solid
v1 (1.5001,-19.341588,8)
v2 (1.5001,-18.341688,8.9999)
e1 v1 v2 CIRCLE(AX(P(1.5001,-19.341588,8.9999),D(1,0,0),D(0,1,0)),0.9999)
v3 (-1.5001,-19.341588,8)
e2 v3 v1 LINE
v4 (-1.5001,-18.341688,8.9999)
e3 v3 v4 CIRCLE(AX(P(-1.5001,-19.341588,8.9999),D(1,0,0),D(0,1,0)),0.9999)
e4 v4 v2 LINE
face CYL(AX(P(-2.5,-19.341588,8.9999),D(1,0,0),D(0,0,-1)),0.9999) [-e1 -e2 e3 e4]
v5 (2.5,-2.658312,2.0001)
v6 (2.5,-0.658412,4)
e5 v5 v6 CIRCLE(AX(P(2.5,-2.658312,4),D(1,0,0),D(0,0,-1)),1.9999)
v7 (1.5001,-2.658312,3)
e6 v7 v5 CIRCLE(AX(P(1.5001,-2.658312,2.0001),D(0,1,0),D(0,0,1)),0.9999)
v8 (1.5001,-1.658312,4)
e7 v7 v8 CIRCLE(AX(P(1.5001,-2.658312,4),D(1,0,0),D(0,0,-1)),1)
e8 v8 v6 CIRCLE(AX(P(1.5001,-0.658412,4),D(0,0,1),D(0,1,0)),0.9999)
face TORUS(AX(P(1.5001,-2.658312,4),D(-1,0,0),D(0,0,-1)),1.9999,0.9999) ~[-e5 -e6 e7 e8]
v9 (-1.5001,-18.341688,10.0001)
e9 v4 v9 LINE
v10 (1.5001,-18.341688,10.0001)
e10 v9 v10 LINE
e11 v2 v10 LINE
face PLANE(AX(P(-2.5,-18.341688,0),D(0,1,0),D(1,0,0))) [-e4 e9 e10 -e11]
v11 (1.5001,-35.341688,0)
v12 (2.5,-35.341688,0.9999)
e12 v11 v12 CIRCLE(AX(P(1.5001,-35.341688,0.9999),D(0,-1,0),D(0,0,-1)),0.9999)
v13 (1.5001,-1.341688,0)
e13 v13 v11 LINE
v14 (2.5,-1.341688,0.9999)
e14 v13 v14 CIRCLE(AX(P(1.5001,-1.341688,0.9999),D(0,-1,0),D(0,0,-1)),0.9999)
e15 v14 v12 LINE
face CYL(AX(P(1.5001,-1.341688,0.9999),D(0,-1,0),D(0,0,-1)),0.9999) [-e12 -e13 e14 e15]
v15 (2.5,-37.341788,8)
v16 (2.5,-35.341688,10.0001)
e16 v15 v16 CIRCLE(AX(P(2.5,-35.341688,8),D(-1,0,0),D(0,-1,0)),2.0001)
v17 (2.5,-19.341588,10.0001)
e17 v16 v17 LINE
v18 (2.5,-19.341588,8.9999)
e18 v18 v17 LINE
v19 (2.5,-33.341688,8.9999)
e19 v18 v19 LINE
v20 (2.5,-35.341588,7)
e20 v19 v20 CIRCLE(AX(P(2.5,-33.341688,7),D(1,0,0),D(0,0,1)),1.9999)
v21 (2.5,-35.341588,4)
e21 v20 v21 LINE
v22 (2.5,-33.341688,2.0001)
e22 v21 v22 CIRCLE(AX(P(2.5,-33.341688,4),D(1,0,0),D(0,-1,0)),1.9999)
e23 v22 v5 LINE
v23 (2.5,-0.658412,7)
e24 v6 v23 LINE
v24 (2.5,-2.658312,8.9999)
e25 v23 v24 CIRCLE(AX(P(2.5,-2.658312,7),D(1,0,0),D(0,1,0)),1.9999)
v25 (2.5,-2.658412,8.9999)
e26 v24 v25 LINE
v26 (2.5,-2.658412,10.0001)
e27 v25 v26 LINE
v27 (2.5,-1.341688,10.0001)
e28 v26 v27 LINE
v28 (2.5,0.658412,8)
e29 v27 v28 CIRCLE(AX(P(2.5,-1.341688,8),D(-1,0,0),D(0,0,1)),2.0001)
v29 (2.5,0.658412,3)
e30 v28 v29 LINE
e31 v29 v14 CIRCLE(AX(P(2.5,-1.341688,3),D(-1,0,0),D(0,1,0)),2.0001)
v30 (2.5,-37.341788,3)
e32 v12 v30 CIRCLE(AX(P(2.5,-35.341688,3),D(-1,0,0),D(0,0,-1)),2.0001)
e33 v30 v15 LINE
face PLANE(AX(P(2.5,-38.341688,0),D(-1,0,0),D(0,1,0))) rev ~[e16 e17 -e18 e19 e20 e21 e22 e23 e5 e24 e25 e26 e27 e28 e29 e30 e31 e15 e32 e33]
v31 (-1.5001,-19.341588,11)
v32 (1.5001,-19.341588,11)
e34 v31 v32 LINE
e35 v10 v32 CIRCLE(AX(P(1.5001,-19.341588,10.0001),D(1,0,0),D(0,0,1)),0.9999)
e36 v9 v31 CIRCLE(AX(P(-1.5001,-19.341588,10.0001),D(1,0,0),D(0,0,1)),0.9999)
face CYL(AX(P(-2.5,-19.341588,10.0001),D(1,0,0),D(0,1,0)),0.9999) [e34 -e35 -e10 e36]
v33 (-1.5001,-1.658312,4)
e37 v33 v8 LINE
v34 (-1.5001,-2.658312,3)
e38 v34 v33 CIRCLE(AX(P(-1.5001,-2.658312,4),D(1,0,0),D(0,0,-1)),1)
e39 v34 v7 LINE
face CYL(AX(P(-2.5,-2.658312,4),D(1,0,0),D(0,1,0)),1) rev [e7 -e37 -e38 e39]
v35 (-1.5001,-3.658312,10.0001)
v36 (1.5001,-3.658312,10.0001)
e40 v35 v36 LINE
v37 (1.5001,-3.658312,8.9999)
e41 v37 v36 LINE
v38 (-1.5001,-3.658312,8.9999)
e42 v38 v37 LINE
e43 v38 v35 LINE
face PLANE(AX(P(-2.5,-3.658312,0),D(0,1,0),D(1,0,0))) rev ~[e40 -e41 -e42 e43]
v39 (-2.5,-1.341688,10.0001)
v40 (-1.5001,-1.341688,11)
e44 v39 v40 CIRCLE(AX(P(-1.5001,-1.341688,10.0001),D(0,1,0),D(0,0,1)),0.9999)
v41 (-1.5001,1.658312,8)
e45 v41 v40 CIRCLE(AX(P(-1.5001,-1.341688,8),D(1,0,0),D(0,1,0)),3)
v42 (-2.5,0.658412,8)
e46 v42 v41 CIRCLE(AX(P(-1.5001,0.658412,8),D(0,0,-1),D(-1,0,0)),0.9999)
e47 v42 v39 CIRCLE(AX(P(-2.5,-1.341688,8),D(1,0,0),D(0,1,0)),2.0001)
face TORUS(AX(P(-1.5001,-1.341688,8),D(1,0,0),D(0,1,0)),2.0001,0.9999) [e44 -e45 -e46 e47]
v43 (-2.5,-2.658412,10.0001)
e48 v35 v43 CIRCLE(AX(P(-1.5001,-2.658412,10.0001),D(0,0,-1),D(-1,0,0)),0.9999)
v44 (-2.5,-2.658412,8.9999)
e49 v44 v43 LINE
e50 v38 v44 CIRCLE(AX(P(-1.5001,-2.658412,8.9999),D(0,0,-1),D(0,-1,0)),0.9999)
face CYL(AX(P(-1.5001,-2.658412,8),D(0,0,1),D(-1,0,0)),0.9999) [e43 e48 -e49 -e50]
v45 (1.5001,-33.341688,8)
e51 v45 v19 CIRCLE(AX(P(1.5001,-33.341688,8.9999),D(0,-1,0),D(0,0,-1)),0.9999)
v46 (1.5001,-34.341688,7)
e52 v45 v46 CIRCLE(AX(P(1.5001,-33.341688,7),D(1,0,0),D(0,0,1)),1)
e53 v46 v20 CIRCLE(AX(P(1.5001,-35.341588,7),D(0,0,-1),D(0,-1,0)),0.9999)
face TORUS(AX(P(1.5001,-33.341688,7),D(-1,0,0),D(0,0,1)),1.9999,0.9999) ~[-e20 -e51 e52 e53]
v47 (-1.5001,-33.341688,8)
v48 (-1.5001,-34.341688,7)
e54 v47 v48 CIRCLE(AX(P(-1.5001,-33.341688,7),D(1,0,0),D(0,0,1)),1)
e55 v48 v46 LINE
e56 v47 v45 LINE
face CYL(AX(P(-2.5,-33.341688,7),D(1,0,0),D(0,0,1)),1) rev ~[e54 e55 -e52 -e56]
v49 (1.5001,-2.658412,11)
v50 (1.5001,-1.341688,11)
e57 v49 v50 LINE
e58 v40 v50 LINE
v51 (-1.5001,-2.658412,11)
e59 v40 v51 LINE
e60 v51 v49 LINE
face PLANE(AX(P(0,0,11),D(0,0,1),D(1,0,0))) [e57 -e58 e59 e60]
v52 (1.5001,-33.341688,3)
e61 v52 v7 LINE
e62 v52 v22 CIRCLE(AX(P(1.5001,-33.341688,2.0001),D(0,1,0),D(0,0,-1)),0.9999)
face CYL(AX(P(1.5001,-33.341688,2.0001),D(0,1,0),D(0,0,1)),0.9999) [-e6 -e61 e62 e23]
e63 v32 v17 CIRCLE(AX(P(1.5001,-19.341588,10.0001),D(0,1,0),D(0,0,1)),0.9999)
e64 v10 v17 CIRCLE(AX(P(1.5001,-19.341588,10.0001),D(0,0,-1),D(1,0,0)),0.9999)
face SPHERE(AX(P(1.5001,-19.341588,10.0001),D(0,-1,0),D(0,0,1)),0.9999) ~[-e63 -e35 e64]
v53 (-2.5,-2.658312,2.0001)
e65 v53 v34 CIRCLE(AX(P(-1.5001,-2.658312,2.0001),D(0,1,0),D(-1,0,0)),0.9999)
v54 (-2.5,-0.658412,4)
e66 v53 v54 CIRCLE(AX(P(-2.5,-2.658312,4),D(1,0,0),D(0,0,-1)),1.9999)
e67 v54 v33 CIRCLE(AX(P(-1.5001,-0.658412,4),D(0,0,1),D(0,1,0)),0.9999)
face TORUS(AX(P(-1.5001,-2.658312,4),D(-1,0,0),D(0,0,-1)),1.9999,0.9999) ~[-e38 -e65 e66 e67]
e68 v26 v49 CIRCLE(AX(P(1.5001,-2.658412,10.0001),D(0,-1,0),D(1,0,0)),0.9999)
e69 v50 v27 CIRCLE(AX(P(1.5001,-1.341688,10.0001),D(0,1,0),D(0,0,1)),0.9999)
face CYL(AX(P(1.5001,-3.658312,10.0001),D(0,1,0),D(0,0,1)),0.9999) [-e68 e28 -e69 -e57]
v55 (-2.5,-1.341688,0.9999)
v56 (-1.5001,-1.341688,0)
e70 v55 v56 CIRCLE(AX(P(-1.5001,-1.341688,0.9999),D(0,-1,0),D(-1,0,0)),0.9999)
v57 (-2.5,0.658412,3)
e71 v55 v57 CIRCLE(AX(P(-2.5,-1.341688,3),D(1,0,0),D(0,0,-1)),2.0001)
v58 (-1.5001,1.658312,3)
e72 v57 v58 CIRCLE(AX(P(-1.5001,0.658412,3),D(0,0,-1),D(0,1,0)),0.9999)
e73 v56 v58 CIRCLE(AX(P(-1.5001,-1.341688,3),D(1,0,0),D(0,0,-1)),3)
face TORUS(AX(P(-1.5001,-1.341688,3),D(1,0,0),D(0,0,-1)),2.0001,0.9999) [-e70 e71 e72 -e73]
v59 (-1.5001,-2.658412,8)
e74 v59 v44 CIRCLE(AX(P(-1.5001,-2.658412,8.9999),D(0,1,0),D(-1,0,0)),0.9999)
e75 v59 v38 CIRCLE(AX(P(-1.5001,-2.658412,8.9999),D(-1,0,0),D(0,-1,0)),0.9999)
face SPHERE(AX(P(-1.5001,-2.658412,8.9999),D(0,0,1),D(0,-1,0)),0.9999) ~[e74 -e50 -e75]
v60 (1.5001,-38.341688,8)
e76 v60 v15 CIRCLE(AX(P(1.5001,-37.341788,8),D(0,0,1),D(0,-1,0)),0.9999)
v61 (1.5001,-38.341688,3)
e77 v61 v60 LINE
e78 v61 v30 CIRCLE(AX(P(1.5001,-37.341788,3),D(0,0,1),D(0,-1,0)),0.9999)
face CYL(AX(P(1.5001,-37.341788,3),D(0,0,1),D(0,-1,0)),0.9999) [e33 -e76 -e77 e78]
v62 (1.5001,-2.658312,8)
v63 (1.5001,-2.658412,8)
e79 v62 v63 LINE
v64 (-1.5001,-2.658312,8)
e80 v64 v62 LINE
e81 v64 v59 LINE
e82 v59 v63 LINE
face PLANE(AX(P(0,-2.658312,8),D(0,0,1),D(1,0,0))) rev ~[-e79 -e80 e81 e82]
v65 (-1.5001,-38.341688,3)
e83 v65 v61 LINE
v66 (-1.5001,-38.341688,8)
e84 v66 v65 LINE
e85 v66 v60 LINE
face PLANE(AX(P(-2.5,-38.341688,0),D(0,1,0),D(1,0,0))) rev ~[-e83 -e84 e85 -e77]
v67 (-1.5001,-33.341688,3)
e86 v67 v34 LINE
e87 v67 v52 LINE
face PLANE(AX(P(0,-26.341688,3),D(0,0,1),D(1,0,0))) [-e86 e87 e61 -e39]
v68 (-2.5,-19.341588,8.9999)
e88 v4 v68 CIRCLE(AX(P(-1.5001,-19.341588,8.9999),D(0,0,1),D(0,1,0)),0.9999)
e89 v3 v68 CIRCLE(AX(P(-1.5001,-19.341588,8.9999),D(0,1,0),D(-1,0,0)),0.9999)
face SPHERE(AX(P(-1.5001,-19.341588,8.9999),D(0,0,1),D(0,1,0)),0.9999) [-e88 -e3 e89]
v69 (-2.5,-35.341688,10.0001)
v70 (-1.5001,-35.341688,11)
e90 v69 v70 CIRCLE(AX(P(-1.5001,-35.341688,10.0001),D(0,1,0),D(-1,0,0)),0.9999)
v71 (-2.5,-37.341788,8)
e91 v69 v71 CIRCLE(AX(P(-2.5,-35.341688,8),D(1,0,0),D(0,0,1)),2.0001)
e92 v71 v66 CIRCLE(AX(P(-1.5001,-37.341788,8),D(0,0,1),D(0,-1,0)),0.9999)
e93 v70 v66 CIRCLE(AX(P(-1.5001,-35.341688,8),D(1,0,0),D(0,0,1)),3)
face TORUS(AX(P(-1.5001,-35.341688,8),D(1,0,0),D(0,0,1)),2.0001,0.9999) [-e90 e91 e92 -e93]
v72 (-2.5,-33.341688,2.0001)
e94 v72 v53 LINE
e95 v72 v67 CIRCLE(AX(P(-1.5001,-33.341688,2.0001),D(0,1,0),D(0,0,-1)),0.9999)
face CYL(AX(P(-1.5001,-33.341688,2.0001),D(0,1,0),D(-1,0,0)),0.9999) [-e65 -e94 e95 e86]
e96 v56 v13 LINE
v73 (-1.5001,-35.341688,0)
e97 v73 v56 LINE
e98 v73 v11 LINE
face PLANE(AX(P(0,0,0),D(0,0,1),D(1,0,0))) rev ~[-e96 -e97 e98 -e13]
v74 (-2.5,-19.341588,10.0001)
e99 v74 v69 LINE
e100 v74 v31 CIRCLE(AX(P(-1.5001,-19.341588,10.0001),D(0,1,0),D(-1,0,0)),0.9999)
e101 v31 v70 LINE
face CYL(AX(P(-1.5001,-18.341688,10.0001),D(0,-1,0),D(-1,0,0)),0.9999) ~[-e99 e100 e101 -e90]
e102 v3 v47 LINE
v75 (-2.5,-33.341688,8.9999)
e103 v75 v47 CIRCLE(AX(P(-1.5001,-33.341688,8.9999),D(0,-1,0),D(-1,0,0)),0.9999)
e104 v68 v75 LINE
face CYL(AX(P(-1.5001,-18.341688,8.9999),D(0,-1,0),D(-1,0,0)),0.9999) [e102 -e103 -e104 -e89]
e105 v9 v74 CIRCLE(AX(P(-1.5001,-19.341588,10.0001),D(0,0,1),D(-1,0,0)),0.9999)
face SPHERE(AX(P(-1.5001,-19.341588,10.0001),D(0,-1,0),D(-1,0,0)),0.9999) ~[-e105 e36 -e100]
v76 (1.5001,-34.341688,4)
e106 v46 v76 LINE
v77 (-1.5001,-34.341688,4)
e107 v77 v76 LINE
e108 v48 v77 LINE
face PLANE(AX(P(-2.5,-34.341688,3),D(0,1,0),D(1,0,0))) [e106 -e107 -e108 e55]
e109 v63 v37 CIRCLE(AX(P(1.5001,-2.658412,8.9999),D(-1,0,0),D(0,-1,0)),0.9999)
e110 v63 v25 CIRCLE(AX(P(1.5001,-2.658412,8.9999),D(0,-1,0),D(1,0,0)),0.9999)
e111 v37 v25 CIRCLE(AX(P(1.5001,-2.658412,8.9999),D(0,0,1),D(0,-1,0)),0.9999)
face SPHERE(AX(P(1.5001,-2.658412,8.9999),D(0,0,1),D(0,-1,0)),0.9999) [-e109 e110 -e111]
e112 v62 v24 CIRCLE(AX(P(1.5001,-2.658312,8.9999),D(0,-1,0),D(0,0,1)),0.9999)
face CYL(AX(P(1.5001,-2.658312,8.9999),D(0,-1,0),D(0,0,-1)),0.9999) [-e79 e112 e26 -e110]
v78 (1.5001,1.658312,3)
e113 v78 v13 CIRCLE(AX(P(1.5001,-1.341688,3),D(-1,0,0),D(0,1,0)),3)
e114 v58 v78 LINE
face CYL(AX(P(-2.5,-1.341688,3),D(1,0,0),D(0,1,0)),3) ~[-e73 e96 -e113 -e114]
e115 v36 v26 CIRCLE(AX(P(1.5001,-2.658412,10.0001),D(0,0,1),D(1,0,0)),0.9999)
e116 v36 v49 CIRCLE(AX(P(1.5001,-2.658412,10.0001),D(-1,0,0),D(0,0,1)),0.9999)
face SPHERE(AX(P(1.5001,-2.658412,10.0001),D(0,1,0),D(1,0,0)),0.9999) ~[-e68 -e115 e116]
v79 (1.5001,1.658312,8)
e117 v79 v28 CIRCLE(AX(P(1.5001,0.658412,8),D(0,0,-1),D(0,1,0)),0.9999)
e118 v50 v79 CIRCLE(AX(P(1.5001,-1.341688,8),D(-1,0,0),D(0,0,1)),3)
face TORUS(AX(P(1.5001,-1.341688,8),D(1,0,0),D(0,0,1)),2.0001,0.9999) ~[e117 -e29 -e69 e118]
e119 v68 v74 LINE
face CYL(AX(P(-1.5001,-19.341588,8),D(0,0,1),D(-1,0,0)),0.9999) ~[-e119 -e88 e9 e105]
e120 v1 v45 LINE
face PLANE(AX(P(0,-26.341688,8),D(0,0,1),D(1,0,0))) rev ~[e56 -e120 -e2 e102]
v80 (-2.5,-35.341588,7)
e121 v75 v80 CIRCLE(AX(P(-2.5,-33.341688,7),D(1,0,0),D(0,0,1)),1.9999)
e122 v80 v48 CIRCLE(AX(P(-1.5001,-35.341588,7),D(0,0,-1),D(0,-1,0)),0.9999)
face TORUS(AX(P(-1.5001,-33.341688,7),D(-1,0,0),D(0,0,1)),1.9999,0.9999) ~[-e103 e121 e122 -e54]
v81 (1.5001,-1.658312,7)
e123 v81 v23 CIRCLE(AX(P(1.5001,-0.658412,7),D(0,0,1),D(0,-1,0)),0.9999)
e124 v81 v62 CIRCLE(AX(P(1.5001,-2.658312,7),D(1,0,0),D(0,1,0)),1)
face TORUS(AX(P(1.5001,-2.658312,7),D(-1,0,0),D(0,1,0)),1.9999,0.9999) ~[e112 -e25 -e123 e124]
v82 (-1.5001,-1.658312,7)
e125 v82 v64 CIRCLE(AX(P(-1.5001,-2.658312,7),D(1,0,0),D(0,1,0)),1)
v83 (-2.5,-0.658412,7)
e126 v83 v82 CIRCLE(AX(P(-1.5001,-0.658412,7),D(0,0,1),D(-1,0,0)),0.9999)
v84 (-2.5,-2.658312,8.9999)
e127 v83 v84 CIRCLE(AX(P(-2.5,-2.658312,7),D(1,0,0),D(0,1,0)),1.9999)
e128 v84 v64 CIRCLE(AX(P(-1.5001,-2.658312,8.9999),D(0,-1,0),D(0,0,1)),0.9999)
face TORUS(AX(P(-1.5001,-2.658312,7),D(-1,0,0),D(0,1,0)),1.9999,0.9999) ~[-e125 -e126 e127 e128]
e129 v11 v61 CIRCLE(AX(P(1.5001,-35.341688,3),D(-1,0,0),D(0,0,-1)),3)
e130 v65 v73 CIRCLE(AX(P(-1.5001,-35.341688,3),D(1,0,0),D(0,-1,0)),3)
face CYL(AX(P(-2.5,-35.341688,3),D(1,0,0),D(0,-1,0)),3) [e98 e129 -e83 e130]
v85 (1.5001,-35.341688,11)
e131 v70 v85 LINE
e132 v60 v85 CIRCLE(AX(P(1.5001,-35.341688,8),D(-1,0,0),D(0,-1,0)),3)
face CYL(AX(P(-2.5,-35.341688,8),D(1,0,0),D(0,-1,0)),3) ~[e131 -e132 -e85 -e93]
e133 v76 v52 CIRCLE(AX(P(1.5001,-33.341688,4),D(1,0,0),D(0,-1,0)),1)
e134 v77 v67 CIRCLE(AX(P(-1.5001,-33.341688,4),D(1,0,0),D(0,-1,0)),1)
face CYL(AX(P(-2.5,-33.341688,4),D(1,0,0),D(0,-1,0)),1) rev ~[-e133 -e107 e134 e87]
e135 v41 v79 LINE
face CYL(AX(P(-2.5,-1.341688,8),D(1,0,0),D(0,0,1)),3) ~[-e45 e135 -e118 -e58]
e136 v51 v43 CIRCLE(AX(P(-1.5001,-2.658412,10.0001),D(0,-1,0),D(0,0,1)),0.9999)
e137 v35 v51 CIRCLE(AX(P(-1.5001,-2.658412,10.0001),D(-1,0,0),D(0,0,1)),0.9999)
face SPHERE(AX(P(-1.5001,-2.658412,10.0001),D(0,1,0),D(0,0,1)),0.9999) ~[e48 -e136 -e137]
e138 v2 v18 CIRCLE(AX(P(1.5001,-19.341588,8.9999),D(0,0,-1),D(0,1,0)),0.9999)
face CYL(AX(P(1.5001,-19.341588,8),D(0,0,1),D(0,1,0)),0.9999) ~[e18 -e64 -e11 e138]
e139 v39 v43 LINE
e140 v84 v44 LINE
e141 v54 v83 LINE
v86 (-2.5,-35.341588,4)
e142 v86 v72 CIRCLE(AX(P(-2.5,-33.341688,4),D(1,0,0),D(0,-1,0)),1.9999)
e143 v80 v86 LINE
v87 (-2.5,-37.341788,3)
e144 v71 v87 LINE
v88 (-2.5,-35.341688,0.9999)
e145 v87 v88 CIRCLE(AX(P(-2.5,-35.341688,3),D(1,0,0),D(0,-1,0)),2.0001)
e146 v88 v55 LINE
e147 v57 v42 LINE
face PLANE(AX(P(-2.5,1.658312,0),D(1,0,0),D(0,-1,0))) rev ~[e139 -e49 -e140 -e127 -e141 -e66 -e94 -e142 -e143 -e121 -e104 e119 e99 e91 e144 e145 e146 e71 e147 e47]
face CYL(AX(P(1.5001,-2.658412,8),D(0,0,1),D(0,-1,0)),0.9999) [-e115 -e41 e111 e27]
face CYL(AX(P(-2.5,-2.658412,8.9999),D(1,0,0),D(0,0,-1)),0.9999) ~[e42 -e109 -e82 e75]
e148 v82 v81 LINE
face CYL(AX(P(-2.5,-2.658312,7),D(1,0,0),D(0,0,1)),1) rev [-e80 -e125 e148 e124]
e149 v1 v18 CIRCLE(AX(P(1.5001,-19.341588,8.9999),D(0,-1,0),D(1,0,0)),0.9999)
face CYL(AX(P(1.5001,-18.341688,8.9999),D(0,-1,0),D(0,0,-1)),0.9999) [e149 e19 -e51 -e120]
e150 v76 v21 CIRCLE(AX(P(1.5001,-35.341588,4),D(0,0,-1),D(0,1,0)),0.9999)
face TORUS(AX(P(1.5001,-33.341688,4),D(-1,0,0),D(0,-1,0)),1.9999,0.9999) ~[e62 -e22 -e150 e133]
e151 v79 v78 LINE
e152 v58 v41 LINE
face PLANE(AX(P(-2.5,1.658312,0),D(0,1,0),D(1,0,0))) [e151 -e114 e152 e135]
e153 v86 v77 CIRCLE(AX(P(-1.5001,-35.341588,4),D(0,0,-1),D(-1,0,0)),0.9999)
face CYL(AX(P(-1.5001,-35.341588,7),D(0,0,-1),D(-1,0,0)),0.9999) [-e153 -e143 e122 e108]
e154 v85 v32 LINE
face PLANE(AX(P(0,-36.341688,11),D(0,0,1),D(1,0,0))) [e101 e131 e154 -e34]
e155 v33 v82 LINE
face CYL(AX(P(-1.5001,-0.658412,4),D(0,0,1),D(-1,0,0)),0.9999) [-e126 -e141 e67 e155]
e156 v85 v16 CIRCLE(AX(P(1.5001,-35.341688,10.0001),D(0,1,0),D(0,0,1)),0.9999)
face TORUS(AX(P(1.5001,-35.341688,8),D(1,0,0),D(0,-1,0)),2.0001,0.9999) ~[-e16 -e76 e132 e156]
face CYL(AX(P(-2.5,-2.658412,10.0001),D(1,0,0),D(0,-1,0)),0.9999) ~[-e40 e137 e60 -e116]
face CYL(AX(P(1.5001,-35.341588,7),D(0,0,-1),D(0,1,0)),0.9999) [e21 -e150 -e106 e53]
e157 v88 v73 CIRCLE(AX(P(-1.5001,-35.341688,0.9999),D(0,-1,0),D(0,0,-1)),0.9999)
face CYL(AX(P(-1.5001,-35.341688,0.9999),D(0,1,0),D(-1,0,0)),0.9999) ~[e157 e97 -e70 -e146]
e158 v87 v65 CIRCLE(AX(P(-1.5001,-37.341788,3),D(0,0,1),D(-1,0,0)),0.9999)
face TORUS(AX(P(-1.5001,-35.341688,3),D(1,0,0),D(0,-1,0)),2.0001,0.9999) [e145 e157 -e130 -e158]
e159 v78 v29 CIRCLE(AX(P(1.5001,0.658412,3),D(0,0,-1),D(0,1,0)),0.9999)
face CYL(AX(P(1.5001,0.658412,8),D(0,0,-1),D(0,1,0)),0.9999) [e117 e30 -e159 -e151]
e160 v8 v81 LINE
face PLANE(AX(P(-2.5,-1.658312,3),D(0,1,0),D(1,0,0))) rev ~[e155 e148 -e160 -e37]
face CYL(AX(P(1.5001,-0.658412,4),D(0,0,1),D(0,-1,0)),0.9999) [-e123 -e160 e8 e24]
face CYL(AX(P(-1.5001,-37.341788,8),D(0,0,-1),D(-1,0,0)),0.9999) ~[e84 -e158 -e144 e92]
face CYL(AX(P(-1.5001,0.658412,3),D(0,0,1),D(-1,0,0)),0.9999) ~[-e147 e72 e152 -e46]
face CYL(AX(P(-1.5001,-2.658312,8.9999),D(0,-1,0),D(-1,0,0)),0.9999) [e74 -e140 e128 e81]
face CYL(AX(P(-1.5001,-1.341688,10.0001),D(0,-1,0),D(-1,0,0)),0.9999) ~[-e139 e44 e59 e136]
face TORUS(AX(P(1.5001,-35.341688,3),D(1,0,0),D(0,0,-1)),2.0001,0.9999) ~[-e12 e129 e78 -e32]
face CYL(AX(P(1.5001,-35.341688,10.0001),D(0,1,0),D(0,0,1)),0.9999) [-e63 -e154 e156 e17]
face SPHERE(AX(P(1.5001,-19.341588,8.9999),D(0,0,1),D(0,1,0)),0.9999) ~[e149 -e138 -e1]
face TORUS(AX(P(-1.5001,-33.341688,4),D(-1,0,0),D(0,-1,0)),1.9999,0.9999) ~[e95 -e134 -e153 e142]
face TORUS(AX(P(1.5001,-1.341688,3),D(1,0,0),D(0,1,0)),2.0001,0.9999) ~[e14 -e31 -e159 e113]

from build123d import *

# Parameters (mm, degrees)
F0_W     = 5
F0_H     = 3.3166247904
F0_H_2   = 16
F0_H_3   = 14.6833752096
F0_H_4   = 2
F1_DEPTH = 3
F2_DEPTH = 11
F3_START = 3
F3_DEPTH = 5
F4_R     = 3
F5_F1_R  = 1
F5_F2_R  = 0.9999


# Not quite as in the source:
# - a fillet or chamfer is up to 0.001 mm smaller than in the source, because OpenCascade refuses the exact size


with BuildPart() as f1:
    # F0 (on Top) → F1 (new body)
    with BuildSketch(Plane.XY):
        Rectangle(F0_W, F0_H)
        with Locations((0, -26.3416876048)):
            Rectangle(F0_W, F0_H_2)
        with Locations((0, -11)):
            Rectangle(F0_W, F0_H_3)
        with Locations((0, -2.6583123952)):
            Rectangle(F0_W, F0_H_4)
        Polygon((2.5, -34.3416876048), (-2.5, -34.3416876048), (-2.5, -38.3416876048), (0, -38.3416876048), (2.5, -38.3416876048), align=None)
    extrude(amount=F1_DEPTH)

    # F0 (on Top) → F2 (join)
    with BuildSketch(Plane.XY):
        Rectangle(F0_W, F0_H)
        with Locations((0, -2.6583123952)):
            Rectangle(F0_W, F0_H_4)
        Polygon((2.5, -34.3416876048), (-2.5, -34.3416876048), (-2.5, -38.3416876048), (0, -38.3416876048), (2.5, -38.3416876048), align=None)
        with Locations((0, -26.3416876048)):
            Rectangle(F0_W, F0_H_2)
    extrude(amount=F2_DEPTH)

    # F0 (on Top) → F3 (cut)
    with BuildSketch(Plane.XY.offset(F3_START)):
        with Locations((0, -2.6583123952)):
            Rectangle(F0_W, F0_H_4)
        with Locations((0, -26.3416876048)):
            Rectangle(F0_W, F0_H_2)
    extrude(amount=F3_DEPTH, mode=Mode.SUBTRACT)

    # F4
    f4_edges = [f1.edges().sort_by_distance(p)[0] for p in [
        (0, 1.658312, 11),
        (0, -38.341688, 11),
        (0, -38.341688, 0),
        (0, 1.658312, 0),
    ]]
    fillet(f4_edges, radius=F4_R)

    # F5: fillet of radius 1 on 16 edges, made by hand

    # F5_f1
    f5_f1_edges = [f1.edges().sort_by_distance(p)[0] for p in [
        (0, -34.3416876048, 8),
        (0, -34.3416876048, 3),
        (0, -1.6583123952, 3),
        (0, -1.6583123952, 8),
    ]]
    fillet(f5_f1_edges, radius=F5_F1_R)

    # F5_f2 (radius 1 in the source; OpenCascade refuses exactly that, so slightly less here)
    f5_f2_edges = [f1.edges().sort_by_distance(p)[0] for p in [
        (-2.5, -26.8416876048, 11),
        (2.5, -26.8416876048, 11),
        (2.5, -3.6583123952, 9.5),
        (0, -3.6583123952, 11),
        (-2.5, -3.6583123952, 9.5),
        (0, -3.6583123952, 8),
        (-2.5, -18.3416876048, 9.5),
        (0, -18.3416876048, 11),
        (2.5, -18.3416876048, 9.5),
        (0, -18.3416876048, 8),
        (2.5, -18, 3),
        (-2.5, -18, 3),
        (2.5, -37.4630079484, 10.1213203436),
        (2.5, -38.3416876048, 5.5),
        (2.5, -37.4630079484, 0.8786796564),
        (2.5, -18.3416876048, 0),
        (2.5, 0.7796327387, 0.8786796564),
        (2.5, 1.6583123952, 5.5),
        (2.5, 0.7796327387, 10.1213203436),
        (2.5, -2.5, 11),
        (-2.5, -37.4630079484, 10.1213203436),
        (-2.5, -38.3416876048, 5.5),
        (-2.5, -37.4630079484, 0.8786796564),
        (-2.5, -18.3416876048, 0),
        (-2.5, 0.7796327387, 0.8786796564),
        (-2.5, 1.6583123952, 5.5),
        (-2.5, 0.7796327387, 10.1213203436),
        (-2.5, -2.5, 11),
        (-2.5, -34.048794386, 3.2928932188),
        (-2.5, -1.951205614, 3.2928932188),
        (2.5, -1.951205614, 3.2928932188),
        (2.5, -34.048794386, 3.2928932188),
    ]]
    fillet(f5_f2_edges, radius=F5_F2_R)


solid = f1.part
